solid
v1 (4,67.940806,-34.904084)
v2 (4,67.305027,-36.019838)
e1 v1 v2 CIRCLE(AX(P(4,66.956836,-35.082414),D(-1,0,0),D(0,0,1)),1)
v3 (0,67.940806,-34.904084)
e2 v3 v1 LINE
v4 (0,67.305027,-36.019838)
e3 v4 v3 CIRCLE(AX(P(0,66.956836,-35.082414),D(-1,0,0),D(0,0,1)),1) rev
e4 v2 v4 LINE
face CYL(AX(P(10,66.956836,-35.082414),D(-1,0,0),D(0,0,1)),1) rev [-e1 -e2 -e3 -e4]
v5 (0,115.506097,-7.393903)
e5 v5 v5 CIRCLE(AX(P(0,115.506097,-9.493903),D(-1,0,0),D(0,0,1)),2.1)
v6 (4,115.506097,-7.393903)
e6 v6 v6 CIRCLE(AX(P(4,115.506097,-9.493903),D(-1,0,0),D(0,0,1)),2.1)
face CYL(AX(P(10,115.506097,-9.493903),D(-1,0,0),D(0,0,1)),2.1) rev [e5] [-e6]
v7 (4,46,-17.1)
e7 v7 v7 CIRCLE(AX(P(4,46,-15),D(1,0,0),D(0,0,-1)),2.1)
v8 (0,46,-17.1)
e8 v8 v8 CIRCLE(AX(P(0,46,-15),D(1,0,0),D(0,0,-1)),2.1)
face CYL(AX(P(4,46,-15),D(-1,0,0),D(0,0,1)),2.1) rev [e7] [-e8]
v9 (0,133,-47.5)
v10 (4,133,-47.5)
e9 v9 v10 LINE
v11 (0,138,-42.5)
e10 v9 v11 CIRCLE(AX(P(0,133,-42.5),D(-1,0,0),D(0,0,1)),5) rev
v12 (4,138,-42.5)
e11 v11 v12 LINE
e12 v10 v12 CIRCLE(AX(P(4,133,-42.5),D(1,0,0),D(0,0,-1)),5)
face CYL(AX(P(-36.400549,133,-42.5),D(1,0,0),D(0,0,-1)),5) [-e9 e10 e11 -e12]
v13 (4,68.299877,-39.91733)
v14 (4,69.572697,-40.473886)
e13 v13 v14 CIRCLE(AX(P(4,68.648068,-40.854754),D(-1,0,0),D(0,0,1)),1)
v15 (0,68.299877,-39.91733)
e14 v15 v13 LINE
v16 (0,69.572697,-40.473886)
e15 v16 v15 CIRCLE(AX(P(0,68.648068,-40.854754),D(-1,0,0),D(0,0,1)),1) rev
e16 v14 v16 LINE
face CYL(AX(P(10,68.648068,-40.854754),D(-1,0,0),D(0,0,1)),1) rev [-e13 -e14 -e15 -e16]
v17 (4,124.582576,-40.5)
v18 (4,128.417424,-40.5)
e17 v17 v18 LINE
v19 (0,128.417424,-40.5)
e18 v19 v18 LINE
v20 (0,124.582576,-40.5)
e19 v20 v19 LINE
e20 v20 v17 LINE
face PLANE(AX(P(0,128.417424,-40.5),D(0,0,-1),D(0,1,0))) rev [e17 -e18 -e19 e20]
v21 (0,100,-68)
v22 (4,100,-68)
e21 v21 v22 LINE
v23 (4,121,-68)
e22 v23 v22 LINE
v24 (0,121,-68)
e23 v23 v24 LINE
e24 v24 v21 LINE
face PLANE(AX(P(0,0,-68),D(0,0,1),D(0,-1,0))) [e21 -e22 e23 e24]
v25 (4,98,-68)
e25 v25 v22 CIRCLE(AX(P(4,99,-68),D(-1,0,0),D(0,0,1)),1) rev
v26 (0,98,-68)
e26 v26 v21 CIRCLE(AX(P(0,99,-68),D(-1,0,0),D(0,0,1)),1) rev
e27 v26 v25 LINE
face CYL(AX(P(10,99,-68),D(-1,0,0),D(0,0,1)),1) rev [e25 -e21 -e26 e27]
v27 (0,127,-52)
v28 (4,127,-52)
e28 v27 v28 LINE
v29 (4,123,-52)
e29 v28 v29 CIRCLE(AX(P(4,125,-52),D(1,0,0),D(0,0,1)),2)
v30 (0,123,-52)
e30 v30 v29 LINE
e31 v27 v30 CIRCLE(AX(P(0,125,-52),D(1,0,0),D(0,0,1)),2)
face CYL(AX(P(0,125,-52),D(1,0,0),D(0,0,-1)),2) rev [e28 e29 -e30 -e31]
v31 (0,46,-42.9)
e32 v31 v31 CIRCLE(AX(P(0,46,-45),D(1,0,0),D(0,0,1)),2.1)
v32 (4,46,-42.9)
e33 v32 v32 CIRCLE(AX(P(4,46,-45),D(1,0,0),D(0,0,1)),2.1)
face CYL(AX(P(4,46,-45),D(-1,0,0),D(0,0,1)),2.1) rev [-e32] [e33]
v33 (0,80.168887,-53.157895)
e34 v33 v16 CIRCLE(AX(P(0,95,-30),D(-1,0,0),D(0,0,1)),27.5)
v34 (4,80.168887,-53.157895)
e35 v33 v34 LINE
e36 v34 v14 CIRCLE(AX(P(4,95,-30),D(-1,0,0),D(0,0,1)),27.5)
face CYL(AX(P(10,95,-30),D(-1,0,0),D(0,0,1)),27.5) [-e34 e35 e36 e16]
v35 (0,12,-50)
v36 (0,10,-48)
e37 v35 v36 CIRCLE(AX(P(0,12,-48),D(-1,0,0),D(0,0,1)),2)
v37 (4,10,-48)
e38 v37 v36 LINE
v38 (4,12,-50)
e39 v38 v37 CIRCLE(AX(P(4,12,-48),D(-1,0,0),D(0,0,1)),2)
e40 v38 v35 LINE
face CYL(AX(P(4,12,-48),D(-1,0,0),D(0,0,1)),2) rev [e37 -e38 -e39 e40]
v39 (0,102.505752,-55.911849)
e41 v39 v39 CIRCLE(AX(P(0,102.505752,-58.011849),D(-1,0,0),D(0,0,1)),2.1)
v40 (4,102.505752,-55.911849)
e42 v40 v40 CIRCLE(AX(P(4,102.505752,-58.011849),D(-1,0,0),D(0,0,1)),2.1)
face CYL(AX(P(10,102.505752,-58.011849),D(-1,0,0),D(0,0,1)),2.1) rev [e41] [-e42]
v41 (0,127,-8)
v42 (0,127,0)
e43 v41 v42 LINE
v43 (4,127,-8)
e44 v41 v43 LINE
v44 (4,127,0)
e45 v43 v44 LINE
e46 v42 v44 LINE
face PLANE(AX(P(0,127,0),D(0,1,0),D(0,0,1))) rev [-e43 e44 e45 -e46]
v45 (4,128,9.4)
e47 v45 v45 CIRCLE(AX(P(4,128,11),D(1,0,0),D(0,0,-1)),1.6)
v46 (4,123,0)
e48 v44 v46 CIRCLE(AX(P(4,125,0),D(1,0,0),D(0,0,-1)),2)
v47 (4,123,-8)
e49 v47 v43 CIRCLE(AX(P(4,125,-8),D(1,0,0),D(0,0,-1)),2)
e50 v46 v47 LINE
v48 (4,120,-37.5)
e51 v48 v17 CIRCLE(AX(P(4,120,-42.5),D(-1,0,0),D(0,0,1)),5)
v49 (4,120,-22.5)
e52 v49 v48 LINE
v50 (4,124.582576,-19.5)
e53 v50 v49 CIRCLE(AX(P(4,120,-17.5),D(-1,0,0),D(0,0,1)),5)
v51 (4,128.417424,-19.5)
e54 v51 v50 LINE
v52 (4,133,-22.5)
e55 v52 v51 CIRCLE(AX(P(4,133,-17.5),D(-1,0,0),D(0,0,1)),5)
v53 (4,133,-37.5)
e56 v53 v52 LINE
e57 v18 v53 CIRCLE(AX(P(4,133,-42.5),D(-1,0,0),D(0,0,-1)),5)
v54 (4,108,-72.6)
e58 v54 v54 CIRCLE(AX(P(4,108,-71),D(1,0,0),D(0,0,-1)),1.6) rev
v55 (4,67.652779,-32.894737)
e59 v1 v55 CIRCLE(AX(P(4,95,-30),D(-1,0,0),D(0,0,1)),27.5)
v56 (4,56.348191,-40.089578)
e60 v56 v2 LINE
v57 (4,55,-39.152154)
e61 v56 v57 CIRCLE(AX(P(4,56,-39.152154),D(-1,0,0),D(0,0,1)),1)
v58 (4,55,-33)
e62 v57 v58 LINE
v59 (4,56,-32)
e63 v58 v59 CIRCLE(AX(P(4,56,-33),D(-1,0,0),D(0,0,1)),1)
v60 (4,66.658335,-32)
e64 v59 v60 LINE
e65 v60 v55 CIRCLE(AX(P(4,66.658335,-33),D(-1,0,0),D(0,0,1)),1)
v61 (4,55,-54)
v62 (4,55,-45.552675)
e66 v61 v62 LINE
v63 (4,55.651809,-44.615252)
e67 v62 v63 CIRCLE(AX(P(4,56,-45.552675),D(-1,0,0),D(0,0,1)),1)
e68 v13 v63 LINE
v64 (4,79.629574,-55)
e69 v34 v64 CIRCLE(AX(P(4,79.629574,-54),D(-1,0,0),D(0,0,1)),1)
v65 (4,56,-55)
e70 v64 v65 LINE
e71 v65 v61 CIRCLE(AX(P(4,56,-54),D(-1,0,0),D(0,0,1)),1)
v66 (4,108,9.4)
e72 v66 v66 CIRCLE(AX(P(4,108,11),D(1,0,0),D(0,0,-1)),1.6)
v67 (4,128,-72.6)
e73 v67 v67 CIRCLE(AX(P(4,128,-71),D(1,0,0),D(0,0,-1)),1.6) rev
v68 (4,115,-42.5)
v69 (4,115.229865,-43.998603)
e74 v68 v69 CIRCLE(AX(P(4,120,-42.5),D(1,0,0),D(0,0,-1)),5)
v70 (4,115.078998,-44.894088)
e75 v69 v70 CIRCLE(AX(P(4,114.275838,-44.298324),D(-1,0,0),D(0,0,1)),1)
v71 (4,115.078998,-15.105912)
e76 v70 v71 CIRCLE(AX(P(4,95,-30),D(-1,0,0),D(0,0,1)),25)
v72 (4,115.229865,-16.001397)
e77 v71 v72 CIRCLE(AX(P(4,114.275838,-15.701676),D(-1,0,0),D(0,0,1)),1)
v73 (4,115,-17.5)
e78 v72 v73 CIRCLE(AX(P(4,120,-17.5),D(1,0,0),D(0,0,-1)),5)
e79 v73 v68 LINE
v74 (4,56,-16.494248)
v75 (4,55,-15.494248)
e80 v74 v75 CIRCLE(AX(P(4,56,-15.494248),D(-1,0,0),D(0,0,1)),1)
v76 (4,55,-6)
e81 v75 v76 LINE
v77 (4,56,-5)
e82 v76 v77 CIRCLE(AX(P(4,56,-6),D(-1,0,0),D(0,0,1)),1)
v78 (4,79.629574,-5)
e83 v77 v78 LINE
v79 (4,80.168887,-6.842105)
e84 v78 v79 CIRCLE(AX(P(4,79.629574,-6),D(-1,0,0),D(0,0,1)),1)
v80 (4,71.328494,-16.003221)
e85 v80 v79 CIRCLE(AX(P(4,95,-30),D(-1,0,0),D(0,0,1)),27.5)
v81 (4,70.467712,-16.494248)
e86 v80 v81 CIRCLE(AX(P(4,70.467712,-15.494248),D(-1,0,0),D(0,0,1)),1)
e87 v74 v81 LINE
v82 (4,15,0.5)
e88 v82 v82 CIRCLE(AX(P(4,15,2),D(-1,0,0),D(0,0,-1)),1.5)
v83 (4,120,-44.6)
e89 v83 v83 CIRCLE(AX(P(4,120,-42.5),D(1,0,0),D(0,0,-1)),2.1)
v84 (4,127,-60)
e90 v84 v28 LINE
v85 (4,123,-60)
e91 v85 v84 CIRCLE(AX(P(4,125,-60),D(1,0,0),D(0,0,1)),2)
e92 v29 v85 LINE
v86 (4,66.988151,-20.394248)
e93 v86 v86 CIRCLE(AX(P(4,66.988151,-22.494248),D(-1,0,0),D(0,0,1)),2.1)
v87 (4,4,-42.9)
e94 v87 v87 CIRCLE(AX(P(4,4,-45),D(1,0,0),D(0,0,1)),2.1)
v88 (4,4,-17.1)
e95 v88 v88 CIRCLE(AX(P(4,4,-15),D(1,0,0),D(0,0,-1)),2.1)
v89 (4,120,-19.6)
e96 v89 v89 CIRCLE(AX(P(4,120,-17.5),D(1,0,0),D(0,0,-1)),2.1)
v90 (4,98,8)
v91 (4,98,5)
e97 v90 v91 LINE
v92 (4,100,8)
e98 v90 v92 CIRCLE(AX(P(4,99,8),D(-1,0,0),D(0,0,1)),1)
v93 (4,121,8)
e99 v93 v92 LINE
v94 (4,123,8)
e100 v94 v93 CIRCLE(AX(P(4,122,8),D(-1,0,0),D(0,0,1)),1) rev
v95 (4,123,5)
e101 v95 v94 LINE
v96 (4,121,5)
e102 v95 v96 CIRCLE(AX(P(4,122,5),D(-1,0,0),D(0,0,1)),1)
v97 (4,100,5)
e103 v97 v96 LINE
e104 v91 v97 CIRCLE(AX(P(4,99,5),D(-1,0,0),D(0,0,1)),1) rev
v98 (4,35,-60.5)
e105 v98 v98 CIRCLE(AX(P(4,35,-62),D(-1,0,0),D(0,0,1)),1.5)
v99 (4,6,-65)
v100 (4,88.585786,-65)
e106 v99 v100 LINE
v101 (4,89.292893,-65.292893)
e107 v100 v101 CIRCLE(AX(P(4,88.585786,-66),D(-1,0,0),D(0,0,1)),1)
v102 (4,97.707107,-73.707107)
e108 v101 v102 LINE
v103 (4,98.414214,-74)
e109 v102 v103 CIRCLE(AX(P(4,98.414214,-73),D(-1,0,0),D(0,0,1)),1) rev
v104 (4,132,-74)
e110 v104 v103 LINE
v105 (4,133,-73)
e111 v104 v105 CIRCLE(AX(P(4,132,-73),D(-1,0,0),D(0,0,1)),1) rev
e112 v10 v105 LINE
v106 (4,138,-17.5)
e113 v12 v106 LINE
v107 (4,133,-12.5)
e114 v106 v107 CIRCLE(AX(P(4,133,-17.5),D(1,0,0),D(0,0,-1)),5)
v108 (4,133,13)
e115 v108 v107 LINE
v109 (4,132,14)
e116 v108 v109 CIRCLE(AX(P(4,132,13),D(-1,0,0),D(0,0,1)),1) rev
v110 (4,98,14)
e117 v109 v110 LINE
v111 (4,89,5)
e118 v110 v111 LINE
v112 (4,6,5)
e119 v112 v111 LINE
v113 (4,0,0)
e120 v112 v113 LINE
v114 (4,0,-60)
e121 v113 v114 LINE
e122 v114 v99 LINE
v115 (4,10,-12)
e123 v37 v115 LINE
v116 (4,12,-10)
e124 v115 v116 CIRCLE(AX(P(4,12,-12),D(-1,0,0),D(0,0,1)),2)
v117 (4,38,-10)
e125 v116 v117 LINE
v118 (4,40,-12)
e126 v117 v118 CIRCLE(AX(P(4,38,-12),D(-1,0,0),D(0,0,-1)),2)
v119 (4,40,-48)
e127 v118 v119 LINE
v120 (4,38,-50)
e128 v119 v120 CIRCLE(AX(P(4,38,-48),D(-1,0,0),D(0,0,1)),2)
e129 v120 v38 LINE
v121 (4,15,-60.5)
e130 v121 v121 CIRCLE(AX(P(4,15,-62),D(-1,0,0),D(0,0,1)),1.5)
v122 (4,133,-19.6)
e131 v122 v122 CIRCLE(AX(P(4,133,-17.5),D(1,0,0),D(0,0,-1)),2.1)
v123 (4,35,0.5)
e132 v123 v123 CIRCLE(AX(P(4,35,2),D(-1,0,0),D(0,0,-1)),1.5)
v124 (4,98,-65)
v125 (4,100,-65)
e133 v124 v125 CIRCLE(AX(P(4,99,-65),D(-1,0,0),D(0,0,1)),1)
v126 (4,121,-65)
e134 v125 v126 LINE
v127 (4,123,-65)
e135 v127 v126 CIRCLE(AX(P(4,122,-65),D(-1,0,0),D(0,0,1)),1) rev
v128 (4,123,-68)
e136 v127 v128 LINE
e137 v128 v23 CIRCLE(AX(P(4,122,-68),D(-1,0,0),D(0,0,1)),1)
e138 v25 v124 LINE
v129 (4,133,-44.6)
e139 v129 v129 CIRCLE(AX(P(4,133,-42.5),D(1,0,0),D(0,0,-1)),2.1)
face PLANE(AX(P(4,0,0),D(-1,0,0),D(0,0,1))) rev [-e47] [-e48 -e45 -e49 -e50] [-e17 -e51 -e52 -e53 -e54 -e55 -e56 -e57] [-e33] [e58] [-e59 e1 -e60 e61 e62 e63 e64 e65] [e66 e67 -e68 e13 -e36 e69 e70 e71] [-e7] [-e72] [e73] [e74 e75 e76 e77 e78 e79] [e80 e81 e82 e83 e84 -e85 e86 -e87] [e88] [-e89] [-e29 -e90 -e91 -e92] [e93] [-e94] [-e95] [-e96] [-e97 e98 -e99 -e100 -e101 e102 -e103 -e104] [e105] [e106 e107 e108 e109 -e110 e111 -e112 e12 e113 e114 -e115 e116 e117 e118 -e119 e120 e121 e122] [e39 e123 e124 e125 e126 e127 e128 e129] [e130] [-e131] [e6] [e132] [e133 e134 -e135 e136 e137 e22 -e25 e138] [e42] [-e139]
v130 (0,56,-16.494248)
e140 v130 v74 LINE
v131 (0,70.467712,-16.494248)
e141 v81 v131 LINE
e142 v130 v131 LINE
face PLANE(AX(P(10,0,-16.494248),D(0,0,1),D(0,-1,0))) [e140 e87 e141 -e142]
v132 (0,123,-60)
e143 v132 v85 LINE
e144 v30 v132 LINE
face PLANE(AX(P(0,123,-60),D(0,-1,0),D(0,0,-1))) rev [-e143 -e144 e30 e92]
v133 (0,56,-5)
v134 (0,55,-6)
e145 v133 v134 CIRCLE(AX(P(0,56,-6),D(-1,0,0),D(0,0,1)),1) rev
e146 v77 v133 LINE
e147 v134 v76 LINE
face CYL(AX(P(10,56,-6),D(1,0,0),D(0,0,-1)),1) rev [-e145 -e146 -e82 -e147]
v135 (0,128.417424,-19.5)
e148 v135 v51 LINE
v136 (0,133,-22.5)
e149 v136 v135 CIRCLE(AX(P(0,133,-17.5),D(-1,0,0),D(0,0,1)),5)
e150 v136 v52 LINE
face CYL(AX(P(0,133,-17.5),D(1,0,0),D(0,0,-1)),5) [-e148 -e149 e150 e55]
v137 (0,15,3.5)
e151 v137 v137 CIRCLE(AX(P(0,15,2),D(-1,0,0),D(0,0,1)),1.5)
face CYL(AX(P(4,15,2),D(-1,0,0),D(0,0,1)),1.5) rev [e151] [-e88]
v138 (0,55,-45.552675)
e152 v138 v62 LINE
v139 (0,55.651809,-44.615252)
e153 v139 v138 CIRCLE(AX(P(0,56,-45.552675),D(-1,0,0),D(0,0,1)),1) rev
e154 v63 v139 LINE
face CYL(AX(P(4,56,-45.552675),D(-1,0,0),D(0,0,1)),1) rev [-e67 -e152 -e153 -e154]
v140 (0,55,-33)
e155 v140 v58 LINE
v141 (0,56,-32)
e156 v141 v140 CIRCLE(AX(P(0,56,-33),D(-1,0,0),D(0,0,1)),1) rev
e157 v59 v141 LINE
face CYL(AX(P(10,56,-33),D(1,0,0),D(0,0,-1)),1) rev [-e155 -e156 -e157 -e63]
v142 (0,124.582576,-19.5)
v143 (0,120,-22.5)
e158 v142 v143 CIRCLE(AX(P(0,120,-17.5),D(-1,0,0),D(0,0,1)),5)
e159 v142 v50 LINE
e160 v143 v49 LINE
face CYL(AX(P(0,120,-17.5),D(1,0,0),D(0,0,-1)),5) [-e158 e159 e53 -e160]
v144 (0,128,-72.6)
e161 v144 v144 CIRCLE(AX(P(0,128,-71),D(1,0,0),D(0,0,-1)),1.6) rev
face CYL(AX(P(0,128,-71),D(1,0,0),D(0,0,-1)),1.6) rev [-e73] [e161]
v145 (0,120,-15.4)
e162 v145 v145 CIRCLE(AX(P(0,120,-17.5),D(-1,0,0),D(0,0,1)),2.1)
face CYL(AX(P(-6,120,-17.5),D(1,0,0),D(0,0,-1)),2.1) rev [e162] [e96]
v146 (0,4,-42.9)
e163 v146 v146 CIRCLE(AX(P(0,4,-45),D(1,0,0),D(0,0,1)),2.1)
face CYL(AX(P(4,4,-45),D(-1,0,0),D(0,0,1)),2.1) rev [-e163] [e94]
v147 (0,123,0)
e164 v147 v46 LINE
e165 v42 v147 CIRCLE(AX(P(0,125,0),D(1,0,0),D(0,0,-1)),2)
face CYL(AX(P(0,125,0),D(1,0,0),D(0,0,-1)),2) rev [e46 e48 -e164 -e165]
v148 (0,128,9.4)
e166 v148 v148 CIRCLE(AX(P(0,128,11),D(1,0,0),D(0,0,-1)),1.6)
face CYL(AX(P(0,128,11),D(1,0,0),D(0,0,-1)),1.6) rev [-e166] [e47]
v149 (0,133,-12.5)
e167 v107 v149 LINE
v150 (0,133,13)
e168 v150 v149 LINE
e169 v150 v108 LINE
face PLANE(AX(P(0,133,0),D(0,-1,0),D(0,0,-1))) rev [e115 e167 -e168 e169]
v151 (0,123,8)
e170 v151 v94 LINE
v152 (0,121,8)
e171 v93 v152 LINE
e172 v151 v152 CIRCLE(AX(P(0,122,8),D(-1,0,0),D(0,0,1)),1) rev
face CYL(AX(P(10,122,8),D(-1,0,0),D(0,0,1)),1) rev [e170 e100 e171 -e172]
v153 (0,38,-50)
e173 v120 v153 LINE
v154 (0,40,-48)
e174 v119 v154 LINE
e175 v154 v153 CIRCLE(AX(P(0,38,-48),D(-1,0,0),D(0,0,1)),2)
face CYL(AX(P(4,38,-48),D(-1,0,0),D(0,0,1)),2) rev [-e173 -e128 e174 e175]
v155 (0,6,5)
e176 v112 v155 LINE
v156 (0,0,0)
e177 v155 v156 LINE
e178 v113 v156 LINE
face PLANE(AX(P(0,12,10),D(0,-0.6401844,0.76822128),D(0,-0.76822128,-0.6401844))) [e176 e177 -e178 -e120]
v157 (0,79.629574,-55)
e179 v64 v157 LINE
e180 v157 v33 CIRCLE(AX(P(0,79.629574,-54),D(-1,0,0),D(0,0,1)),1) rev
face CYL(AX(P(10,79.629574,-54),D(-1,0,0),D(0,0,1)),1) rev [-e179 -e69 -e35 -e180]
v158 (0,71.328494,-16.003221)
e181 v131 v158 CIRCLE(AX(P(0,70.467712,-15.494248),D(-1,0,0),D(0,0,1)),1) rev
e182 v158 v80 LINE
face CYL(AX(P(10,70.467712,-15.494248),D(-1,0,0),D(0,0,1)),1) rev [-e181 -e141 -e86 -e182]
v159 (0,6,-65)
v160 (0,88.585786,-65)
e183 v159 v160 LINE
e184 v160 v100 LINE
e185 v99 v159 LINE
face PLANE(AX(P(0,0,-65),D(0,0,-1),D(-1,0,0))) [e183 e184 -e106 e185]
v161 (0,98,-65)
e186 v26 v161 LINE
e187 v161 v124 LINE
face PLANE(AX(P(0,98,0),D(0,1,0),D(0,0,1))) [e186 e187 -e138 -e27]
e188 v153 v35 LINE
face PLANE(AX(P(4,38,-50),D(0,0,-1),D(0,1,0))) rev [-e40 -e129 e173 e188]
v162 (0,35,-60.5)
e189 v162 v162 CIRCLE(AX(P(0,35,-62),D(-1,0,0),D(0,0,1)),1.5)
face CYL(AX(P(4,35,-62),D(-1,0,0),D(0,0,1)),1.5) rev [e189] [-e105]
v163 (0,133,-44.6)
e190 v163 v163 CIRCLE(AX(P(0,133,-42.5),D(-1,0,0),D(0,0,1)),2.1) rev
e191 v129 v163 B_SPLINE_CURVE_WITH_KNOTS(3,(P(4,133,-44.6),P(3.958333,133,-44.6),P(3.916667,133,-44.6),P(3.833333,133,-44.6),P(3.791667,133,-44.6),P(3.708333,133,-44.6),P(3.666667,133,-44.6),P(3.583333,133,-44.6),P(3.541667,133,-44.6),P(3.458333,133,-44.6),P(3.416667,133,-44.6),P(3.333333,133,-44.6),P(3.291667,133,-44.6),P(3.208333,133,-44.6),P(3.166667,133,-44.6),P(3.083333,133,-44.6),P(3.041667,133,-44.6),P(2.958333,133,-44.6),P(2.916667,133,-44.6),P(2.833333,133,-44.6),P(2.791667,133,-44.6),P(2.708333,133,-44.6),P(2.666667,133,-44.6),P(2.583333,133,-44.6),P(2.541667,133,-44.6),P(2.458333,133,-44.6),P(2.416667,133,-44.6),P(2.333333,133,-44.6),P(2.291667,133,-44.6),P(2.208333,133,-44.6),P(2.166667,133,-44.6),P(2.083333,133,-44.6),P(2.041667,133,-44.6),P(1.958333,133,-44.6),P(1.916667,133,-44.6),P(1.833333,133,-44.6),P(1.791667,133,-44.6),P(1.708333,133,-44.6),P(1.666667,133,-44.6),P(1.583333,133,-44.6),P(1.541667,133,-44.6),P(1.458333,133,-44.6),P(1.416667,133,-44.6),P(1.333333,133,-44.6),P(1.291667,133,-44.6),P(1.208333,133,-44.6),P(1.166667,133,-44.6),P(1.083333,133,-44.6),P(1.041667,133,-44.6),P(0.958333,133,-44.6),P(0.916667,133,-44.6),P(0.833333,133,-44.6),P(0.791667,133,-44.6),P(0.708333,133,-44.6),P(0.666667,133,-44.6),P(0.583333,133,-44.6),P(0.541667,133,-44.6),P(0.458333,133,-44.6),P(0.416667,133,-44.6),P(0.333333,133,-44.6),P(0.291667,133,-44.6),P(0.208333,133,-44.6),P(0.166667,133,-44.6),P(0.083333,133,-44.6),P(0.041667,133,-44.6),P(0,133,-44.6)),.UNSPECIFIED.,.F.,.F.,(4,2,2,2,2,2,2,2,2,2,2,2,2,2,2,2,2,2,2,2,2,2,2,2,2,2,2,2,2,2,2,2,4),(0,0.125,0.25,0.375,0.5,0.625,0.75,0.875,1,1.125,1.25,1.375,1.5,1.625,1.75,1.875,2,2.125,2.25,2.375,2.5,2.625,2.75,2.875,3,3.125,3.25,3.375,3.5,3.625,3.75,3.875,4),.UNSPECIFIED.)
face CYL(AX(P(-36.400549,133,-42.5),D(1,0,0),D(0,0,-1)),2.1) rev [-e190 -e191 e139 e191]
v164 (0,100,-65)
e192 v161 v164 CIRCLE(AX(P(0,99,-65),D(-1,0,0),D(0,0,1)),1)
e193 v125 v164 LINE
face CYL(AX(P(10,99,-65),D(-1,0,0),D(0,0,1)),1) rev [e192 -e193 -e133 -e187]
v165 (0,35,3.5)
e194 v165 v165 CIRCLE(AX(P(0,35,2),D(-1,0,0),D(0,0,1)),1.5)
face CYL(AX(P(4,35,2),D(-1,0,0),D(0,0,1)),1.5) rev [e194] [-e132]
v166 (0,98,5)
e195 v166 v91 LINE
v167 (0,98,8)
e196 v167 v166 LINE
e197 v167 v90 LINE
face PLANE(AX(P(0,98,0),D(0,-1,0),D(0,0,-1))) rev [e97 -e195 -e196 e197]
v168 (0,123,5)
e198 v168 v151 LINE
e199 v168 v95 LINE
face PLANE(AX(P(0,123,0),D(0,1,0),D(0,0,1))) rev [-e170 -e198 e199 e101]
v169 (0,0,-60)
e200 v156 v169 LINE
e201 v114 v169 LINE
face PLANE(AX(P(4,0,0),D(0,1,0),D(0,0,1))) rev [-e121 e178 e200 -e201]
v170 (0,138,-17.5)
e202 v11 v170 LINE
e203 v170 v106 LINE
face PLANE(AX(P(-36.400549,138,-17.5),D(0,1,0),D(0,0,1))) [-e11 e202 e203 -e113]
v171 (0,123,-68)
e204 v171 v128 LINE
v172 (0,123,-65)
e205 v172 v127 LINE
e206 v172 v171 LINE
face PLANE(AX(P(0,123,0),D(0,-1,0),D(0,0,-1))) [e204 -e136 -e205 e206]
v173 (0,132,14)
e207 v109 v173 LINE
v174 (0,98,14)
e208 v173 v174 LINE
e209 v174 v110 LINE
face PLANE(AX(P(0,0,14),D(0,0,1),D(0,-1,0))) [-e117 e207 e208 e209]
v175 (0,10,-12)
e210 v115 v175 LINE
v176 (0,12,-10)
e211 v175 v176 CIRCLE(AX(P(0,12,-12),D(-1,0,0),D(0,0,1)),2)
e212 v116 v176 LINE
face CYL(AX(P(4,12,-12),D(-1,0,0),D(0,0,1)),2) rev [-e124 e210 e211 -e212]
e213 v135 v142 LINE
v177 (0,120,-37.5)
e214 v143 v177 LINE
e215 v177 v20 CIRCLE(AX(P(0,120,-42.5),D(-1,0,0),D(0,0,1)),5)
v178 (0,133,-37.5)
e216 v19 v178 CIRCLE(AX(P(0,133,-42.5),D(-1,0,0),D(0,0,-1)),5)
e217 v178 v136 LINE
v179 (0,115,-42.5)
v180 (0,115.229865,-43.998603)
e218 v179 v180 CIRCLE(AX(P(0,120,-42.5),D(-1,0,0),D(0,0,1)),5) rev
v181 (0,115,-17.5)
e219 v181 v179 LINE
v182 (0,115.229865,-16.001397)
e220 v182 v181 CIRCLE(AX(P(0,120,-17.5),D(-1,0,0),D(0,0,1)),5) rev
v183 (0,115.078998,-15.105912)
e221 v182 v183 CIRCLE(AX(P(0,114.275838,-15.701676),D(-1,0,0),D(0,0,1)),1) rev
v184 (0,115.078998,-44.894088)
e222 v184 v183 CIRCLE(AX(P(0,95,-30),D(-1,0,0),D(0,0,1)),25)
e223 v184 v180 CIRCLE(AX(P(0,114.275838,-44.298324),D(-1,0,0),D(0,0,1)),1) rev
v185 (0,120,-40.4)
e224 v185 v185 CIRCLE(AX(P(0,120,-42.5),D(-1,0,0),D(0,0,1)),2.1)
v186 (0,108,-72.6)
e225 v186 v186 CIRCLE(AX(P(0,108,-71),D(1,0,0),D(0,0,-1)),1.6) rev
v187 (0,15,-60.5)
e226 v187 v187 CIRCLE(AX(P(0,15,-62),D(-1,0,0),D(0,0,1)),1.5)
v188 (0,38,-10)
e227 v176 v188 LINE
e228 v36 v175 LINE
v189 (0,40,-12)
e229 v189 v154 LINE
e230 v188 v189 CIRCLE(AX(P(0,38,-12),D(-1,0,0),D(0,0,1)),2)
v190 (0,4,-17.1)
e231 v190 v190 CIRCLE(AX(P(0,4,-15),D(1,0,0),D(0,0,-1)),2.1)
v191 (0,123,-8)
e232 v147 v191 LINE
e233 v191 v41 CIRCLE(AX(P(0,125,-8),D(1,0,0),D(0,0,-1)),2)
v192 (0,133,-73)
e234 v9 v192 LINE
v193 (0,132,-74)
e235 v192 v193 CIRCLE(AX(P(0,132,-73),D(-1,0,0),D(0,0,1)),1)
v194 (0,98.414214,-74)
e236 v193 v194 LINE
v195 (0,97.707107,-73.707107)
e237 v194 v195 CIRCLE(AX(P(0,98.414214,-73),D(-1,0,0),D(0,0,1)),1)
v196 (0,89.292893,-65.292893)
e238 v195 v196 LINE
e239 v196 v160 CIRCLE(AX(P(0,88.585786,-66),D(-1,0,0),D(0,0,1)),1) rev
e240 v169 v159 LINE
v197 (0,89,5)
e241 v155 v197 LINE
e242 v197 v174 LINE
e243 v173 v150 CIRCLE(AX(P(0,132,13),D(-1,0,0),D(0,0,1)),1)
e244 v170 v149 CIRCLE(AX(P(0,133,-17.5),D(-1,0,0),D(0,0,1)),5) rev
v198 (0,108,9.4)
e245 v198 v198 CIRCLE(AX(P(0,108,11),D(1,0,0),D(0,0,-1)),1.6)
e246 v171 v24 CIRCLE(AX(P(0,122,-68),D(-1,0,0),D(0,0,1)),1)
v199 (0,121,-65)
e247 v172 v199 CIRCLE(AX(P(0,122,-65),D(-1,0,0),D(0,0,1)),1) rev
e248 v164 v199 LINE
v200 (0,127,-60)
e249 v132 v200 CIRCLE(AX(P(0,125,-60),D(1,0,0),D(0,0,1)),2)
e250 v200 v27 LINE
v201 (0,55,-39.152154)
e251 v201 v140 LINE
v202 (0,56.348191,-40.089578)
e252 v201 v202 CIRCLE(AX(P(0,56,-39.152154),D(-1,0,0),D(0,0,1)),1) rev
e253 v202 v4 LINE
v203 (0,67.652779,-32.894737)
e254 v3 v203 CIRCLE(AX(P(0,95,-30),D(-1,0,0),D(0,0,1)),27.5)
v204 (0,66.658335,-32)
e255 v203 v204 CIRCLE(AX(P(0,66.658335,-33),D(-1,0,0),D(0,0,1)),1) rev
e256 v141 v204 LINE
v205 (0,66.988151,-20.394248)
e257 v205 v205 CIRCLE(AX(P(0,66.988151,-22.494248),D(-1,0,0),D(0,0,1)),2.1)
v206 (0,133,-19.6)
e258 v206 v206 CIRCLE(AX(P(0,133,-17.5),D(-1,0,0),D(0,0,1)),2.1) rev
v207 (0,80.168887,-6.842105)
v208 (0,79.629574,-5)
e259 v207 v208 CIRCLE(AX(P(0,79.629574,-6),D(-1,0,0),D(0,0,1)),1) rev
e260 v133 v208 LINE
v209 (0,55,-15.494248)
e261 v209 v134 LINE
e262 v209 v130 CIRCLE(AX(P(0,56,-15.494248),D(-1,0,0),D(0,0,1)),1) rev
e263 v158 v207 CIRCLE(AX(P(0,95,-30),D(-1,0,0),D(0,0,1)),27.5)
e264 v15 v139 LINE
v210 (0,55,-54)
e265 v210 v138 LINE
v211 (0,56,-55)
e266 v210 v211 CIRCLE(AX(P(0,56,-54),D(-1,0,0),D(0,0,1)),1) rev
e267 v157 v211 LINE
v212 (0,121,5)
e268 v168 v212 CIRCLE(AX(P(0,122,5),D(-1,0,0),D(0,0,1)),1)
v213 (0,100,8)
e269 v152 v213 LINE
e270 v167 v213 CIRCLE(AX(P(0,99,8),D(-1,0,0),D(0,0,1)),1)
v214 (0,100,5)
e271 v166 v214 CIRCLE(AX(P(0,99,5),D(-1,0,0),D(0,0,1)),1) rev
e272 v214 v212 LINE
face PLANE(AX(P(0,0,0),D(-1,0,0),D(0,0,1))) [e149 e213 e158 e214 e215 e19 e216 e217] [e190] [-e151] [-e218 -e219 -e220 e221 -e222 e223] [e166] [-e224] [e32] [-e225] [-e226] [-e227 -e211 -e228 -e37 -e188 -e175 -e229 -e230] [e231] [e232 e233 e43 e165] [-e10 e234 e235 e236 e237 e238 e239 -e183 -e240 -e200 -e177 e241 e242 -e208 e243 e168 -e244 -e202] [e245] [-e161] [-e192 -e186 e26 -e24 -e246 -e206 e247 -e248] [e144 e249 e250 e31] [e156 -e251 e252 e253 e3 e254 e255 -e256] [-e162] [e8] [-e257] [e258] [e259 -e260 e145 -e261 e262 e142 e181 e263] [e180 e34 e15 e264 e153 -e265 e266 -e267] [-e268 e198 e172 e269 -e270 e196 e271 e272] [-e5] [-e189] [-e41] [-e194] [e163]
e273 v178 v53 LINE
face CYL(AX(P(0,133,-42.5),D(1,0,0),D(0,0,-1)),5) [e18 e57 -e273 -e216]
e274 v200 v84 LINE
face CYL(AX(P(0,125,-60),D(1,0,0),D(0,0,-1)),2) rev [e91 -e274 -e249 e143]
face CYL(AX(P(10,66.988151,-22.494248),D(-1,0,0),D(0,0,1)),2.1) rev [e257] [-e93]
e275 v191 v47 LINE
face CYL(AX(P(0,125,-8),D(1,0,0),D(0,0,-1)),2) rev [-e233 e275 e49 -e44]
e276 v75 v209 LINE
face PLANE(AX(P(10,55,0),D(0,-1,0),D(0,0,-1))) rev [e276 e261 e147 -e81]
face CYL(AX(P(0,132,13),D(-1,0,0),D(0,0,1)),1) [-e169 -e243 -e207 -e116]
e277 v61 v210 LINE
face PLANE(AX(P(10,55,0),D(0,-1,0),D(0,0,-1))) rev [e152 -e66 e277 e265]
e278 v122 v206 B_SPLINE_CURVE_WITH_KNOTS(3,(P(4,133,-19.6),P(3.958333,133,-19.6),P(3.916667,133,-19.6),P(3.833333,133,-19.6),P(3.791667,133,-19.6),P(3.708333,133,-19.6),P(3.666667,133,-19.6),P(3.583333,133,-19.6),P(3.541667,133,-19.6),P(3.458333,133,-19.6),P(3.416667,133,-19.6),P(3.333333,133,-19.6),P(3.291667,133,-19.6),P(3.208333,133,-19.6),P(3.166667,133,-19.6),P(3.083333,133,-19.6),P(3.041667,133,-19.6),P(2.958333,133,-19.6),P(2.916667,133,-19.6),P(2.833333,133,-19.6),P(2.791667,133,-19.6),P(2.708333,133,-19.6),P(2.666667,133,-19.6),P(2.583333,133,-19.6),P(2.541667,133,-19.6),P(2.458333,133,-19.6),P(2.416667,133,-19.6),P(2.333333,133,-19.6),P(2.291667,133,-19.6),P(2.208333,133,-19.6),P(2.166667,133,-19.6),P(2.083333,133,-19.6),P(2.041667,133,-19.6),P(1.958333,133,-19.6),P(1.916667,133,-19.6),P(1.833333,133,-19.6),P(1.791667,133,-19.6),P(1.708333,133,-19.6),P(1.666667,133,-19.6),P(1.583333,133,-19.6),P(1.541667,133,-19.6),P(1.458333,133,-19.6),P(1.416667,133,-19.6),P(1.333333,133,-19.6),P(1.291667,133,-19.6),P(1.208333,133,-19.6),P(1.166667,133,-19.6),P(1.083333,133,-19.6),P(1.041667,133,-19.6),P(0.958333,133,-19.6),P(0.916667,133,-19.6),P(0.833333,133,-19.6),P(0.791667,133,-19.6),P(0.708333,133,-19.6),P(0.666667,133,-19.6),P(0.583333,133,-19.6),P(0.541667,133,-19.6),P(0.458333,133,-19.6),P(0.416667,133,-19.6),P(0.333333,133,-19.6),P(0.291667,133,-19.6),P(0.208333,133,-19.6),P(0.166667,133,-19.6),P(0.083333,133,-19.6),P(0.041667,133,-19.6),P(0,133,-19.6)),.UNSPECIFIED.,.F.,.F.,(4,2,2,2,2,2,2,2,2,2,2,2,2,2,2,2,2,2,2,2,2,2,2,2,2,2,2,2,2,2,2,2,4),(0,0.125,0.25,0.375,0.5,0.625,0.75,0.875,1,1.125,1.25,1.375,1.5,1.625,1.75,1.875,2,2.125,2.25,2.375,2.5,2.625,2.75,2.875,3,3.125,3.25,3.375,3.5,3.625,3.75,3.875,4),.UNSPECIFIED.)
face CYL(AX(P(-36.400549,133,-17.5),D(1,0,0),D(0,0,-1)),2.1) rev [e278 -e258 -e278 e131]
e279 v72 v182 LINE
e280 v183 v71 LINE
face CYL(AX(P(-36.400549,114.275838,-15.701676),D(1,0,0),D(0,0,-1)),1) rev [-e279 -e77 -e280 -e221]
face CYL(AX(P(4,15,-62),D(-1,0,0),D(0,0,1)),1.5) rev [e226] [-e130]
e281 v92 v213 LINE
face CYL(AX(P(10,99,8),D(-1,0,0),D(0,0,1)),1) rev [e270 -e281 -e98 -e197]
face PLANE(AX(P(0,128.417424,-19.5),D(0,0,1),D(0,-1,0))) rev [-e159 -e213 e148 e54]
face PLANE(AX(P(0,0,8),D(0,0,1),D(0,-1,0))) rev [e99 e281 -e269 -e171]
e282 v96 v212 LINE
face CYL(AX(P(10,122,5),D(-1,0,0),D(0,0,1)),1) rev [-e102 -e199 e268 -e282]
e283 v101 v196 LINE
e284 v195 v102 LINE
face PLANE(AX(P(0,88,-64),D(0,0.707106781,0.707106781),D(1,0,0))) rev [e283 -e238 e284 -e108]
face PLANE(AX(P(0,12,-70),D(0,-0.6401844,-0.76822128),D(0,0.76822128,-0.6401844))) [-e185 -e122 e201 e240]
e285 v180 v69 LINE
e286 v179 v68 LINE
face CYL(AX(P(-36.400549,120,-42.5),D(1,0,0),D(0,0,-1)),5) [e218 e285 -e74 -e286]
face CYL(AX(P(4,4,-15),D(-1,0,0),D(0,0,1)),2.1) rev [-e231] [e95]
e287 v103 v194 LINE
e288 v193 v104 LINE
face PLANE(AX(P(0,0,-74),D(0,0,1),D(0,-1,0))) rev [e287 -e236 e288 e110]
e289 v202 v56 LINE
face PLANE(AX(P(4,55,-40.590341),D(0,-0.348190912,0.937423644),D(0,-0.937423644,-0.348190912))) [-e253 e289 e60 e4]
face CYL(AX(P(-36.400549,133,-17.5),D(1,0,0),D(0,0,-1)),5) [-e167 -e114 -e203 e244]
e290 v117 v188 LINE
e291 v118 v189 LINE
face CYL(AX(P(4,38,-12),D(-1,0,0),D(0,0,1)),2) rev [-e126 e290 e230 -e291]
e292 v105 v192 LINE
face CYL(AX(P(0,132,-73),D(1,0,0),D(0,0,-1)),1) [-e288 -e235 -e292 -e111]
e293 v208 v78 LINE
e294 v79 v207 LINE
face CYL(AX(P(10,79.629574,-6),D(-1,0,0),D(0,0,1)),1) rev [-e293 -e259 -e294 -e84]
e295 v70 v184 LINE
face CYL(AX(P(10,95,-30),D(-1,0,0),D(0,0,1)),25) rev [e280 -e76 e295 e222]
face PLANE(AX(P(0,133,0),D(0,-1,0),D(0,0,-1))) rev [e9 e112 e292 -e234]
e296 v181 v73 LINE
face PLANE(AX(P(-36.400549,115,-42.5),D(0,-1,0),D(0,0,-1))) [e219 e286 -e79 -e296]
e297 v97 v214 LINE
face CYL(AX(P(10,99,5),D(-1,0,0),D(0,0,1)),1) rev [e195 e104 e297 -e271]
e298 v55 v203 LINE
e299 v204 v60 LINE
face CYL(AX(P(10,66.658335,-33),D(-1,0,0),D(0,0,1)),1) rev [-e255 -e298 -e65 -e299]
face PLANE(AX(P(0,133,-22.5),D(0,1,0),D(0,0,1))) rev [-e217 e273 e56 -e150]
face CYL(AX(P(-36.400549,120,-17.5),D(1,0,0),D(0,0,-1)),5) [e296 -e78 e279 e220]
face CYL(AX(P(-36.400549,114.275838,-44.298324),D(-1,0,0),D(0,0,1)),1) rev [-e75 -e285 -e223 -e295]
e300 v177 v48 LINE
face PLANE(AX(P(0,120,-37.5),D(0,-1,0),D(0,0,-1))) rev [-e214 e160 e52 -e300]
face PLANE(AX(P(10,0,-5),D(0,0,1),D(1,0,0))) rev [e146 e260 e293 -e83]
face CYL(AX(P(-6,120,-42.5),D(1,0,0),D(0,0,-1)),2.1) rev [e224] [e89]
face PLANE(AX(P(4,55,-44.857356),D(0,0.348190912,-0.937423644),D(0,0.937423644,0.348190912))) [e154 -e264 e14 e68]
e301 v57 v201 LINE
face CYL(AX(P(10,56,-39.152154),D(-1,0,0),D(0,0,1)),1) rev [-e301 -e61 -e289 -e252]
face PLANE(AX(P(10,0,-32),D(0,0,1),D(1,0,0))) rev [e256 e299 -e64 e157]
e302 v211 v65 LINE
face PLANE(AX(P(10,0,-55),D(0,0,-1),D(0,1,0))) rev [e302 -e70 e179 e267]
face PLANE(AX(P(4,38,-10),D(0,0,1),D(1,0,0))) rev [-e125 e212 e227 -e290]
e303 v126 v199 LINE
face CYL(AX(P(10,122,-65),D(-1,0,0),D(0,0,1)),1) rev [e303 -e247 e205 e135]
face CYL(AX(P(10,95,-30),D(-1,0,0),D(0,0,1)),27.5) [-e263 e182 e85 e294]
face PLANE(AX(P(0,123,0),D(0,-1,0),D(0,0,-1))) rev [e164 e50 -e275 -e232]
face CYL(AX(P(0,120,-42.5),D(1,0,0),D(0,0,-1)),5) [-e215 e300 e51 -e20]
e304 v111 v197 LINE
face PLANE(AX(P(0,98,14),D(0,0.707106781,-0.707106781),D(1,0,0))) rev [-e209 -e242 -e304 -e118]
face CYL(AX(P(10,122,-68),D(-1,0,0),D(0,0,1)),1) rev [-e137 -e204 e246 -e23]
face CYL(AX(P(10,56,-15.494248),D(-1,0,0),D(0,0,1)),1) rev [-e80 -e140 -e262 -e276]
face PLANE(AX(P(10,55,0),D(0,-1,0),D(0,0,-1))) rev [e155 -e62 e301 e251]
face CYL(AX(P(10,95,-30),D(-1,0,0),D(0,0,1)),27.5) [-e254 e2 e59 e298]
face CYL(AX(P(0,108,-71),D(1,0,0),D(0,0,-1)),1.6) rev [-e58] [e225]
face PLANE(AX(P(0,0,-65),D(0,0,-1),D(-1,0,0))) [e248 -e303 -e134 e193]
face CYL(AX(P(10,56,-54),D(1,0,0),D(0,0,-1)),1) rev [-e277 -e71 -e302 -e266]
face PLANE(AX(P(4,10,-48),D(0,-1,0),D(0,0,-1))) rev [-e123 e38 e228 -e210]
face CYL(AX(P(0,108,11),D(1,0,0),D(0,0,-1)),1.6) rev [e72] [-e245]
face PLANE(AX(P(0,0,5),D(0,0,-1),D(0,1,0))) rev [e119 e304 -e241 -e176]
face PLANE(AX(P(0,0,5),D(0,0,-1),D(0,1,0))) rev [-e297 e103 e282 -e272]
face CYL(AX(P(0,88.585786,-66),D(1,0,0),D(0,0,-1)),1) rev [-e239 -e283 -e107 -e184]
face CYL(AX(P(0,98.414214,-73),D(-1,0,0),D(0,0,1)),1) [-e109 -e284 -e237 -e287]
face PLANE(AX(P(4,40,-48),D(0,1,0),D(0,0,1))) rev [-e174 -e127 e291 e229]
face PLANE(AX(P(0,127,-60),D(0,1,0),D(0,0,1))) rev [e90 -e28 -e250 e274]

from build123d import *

# Parameters (mm, degrees)
SKETCH_1_W           = 60
SKETCH_1_H           = 50
SKETCH_1_R           = 2.1
EXTRUDE_1_DEPTH      = 4
EXTRUDE_2_DEPTH      = 4
EXTRUDE_4_DEPTH      = 4
SKETCH_10_W          = 9
SKETCH_10_H          = 10
SKETCH_10_W_2        = 3
EXTRUDE_5_DEPTH      = 4
CHAMFER_1_SIZE       = 10
SKETCH_11_R          = 25
SKETCH_11_R_2        = 2.1
CUT_EXTRUDE_7_DEPTH  = 10
CUT_EXTRUDE_8_DEPTH  = 10
EXTRUDE_6_DEPTH      = 4
SKETCH_16_R          = 1.6
CUT_EXTRUDE_9_DEPTH  = 4
CUT_EXTRUDE_11_DEPTH = 10
SKETCH_21_R          = 2.1
EXTRUDE_7_DEPTH      = 4
SKETCH_21_2_R        = 2.1
CUT_EXTRUDE_12_DEPTH = 10
CUT_EXTRUDE_13_DEPTH = 157.639713994
CUT_EXTRUDE_14_DEPTH = 157.639713994
SKETCH_24_R          = 1.5
CUT_EXTRUDE_15_DEPTH = 4
FILLET_1_R           = 1


with BuildPart() as part:
    # 草图1 → 凸台-拉伸1 (new body)
    with BuildSketch(Plane(origin=(0, 0, 0), x_dir=(0, 0, -1), z_dir=(1, 0, 0))):
        with Locations((30, 25)):
            Rectangle(SKETCH_1_W, SKETCH_1_H)
        with Locations((15, 4)):
            Circle(SKETCH_1_R, mode=Mode.SUBTRACT)
        with Locations((15, 46)):
            Circle(SKETCH_1_R, mode=Mode.SUBTRACT)
        with Locations(Location((45, 4, 0), (0, 0, 180))):
            Circle(SKETCH_1_R, mode=Mode.SUBTRACT)
        with Locations(Location((45, 46, 0), (0, 0, 180))):
            Circle(SKETCH_1_R, mode=Mode.SUBTRACT)
    extrude(amount=EXTRUDE_1_DEPTH)

    # 草图3 → 凸台-拉伸2 (add)
    with BuildSketch(Plane(origin=(4, 0, 0), x_dir=(0, 0, -1), z_dir=(1, 0, 0))):
        Polygon((0, 50), (-10, 38), (-10, 12), (0, 0), align=None)
        Polygon((70, 12), (60, 0), (60, 50), (70, 38), align=None)
    extrude(amount=-EXTRUDE_2_DEPTH)

    # 草图9 → 凸台-拉伸4 (add)
    with BuildSketch(Plane(origin=(4, 0, 0), x_dir=(0, 0, -1), z_dir=(1, 0, 0))):
        Polygon((60, 50), (65, 50), (65, 133), (60, 133), (0, 133), (-5, 133), (-5, 50), (0, 50), align=None)
        Polygon((-5, 50), (-5, 44), (0, 50), align=None)
        Polygon((65, 44), (60, 50), (65, 50), align=None)
    extrude(amount=-EXTRUDE_4_DEPTH)

    # 草图10 → 凸台-拉伸5 (add)
    with BuildSketch(Plane(origin=(4, 0, 0), x_dir=(0, 0, -1), z_dir=(1, 0, 0))):
        with Locations((-9.5, 128)):
            Rectangle(SKETCH_10_W, SKETCH_10_H)
        Polygon((-8, 123), (-14, 123), (-14, 88), (-8, 88), (-8, 98), align=None)
        with Locations((-6.5, 93)):
            Rectangle(SKETCH_10_W_2, SKETCH_10_H)
        with Locations((66.5, 93)):
            Rectangle(SKETCH_10_W_2, SKETCH_10_H)
        Polygon((68, 98), (68, 88), (74, 88), (74, 123), (68, 123), align=None)
        Polygon((65, 123), (68, 123), (74, 123), (74, 133), (65, 133), align=None)
    extrude(amount=-EXTRUDE_5_DEPTH)

    # 倒角1
    # the kernel refuses this chamfer: 10 mm, written as the material it takes off along each edge
    with BuildSketch(Plane(origin=(29.71682988, 88, -74), x_dir=(0, 0.9996219169112968, -0.027495876610586317), z_dir=(-1, 0, 0))) as chamfer_1_piece_1_section:
        Polygon((CHAMFER_1_SIZE * 0.999621916911, -CHAMFER_1_SIZE * 0.0274958766106), (-CHAMFER_1_SIZE * 0.0274958766106, -CHAMFER_1_SIZE * 0.999621916911), (0, 0), align=None)
    chamfer_1_piece_1 = extrude(amount=55.433659759, mode=Mode.PRIVATE)
    chamfer_1_piece_1 = split(chamfer_1_piece_1, bisect_by=Plane(origin=(2, 91.359007471, -65), z_dir=(0, 0, -1)), keep=Keep.TOP, mode=Mode.PRIVATE)
    add(chamfer_1_piece_1, mode=Mode.SUBTRACT)
    with BuildSketch(Plane(origin=(29.71682988, 88, 14), x_dir=(0, -0.027495876610586317, -0.9996219169112968), z_dir=(-1, 0, 0))) as chamfer_1_piece_2_section:
        Polygon((CHAMFER_1_SIZE * 0.999621916911, -CHAMFER_1_SIZE * 0.0274958766106), (-CHAMFER_1_SIZE * 0.0274958766106, -CHAMFER_1_SIZE * 0.999621916911), (0, 0), align=None)
    chamfer_1_piece_2 = extrude(amount=55.433659759, mode=Mode.PRIVATE)
    chamfer_1_piece_2 = split(chamfer_1_piece_2, bisect_by=Plane(origin=(2, 91.359007471, 5), z_dir=(0, 0, 1)), keep=Keep.TOP, mode=Mode.PRIVATE)
    add(chamfer_1_piece_2, mode=Mode.SUBTRACT)

    # 草图11 → 切除-拉伸7 (cut)
    with BuildSketch(Plane.ZY):
        with Locations((-30, 95)):
            Circle(SKETCH_11_R)
        with Locations((-9.493903346, 115.506096654)):
            Circle(SKETCH_11_R_2)
        with Locations((-22.494247692, 66.988151038)):
            Circle(SKETCH_11_R_2)
        with Locations((-58.011848962, 102.505752308)):
            Circle(SKETCH_11_R_2)
    extrude(amount=-CUT_EXTRUDE_7_DEPTH, mode=Mode.SUBTRACT)

    # 草图12 → 切除-拉伸8 (cut)
    with BuildSketch(Plane.ZY):
        with BuildLine():
            ThreePointArc((-32, 67.572823696), (-45.68490072, 72.411642614), (-55, 83.543560763))
            Line((-55, 83.543560763), (-55, 55))
            Line((-55, 55), (-32, 55))
            Line((-32, 55), (-32, 67.572823696))
        make_face()
        with BuildLine():
            ThreePointArc((-5, 83.543560763), (-9.75828346, 76.38487412), (-16.494247692, 71.044945114))
            Line((-16.494247692, 71.044945114), (-16.494247692, 55))
            Line((-16.494247692, 55), (-5, 55))
            Line((-5, 55), (-5, 83.543560763))
        make_face()
    extrude(amount=-CUT_EXTRUDE_8_DEPTH, mode=Mode.SUBTRACT)

    # 草图14 → 凸台-拉伸6 (add)
    with BuildSketch(Plane.ZY):
        with BuildLine():
            Line((-44.857355631, 55), (-39.575250068, 69.220849779))
            ThreePointArc((-39.575250068, 69.220849779), (-37.669905745, 68.591241115), (-35.723722086, 68.102249063))
            Line((-35.723722086, 68.102249063), (-40.590341434, 55))
            Line((-40.590341434, 55), (-44.857355631, 55))
        make_face()
    extrude(amount=-EXTRUDE_6_DEPTH)

    # 草图16 → 切除-拉伸9 (cut)
    with BuildSketch(Plane(origin=(4, 0, 0), x_dir=(0, 0, -1), z_dir=(1, 0, 0))):
        with Locations((-11, 128)):
            Circle(SKETCH_16_R)
        with Locations((-11, 108)):
            Circle(SKETCH_16_R)
        with Locations((71, 108)):
            Circle(SKETCH_16_R)
        with Locations((71, 128)):
            Circle(SKETCH_16_R)
    extrude(amount=-CUT_EXTRUDE_9_DEPTH, mode=Mode.SUBTRACT)

    # 草图20 → 切除-拉伸11 (cut)
    with BuildSketch(Plane.ZY):
        with BuildLine():
            ThreePointArc((8, 121), (9, 122), (8, 123))
            Line((8, 123), (8, 121))
        make_face()
        with BuildLine():
            Line((8, 100), (8, 98))
            ThreePointArc((8, 98), (9, 99), (8, 100))
        make_face()
        with BuildLine():
            Line((5, 121), (5, 123))
            ThreePointArc((5, 123), (4, 122), (5, 121))
        make_face()
        with BuildLine():
            ThreePointArc((5, 100), (4, 99), (5, 98))
            Line((5, 98), (5, 100))
        make_face()
        with BuildLine():
            Line((-65, 100), (-65, 98))
            ThreePointArc((-65, 98), (-64, 99), (-65, 100))
        make_face()
        with BuildLine():
            ThreePointArc((-65, 121), (-64, 122), (-65, 123))
            Line((-65, 123), (-65, 121))
        make_face()
        with BuildLine():
            ThreePointArc((-68, 100), (-69, 99), (-68, 98))
            Line((-68, 98), (-68, 100))
        make_face()
        with BuildLine():
            Line((-68, 121), (-68, 123))
            ThreePointArc((-68, 123), (-69, 122), (-68, 121))
        make_face()
    extrude(amount=-CUT_EXTRUDE_11_DEPTH, mode=Mode.SUBTRACT)

    # 草图21 → 凸台-拉伸7 (add)
    # profile 1 of 2: a face of its own
    with BuildSketch(Plane(origin=(4, 0, 0), x_dir=(0, 0, -1), z_dir=(1, 0, 0))):
        with BuildLine():
            Line((17.5, 138), (42.5, 138))
            ThreePointArc((42.5, 138), (46.035533906, 129.464466094), (37.5, 133))
            Line((37.5, 133), (22.5, 133))
            ThreePointArc((22.5, 133), (13.964466094, 129.464466094), (17.5, 138))
        make_face()
        with Locations((17.5, 133)):
            Circle(SKETCH_21_R, mode=Mode.SUBTRACT)
        with Locations((42.5, 133)):
            Circle(SKETCH_21_R, mode=Mode.SUBTRACT)
    # profile 2 of 2: a face of its own
    with BuildSketch(Plane(origin=(4, 0, 0), x_dir=(0, 0, -1), z_dir=(1, 0, 0))):
        with BuildLine():
            Line((42.5, 115), (17.5, 115))
            ThreePointArc((17.5, 115), (13.964466094, 123.535533906), (22.5, 120))
            Line((22.5, 120), (37.5, 120))
            ThreePointArc((37.5, 120), (46.035533906, 123.535533906), (42.5, 115))
        make_face()
        with Locations((17.5, 120)):
            Circle(SKETCH_21_R, mode=Mode.SUBTRACT)
        with Locations((42.5, 120)):
            Circle(SKETCH_21_R, mode=Mode.SUBTRACT)
    extrude(amount=-EXTRUDE_7_DEPTH)

    # 草图21<2> → 切除-拉伸12 (cut)
    with BuildSketch(Plane(origin=(4, 0, 0), x_dir=(0, 0, -1), z_dir=(1, 0, 0))):
        with Locations((17.5, 133)):
            Circle(SKETCH_21_2_R)
        with Locations((17.5, 120)):
            Circle(SKETCH_21_2_R)
        with Locations((42.5, 120)):
            Circle(SKETCH_21_2_R)
        with Locations((42.5, 133)):
            Circle(SKETCH_21_2_R)
    extrude(amount=-CUT_EXTRUDE_12_DEPTH, mode=Mode.SUBTRACT)

    # 草图22 → 切除-拉伸13 (cut, through all)
    with BuildSketch(Plane(origin=(4, 0, 0), x_dir=(0, 0, -1), z_dir=(1, 0, 0))):
        with BuildLine():
            Line((22.5, 133), (37.5, 133))
            ThreePointArc((37.5, 133), (38.316699867, 130.261387212), (40.5, 128.417424305))
            Line((40.5, 128.417424305), (40.5, 124.582575695))
            ThreePointArc((40.5, 124.582575695), (38.316699867, 122.738612788), (37.5, 120))
            Line((37.5, 120), (22.5, 120))
            ThreePointArc((22.5, 120), (21.683300133, 122.738612788), (19.5, 124.582575695))
            Line((19.5, 124.582575695), (19.5, 128.417424305))
            ThreePointArc((19.5, 128.417424305), (21.683300133, 130.261387212), (22.5, 133))
        make_face()
    extrude(amount=-CUT_EXTRUDE_13_DEPTH, mode=Mode.SUBTRACT)

    # 草图23 → 切除-拉伸14 (cut, through all)
    with BuildSketch(Plane(origin=(4, 0, 0), x_dir=(0, 0, -1), z_dir=(1, 0, 0))):
        with BuildLine():
            Line((0, 127), (8, 127))
            ThreePointArc((8, 127), (10, 125), (8, 123))
            Line((8, 123), (0, 123))
            ThreePointArc((0, 123), (-2, 125), (0, 127))
        make_face()
        with BuildLine():
            Line((60, 127), (52, 127))
            ThreePointArc((52, 127), (50, 125), (52, 123))
            Line((52, 123), (60, 123))
            ThreePointArc((60, 123), (62, 125), (60, 127))
        make_face()
    extrude(amount=-CUT_EXTRUDE_14_DEPTH, mode=Mode.SUBTRACT)

    # 草图24 → 切除-拉伸15 (cut)
    with BuildSketch(Plane.ZY):
        with Locations((-62, 35)):
            Circle(SKETCH_24_R)
        with Locations((-62, 15)):
            Circle(SKETCH_24_R)
        with Locations((2, 15)):
            Circle(SKETCH_24_R)
        with Locations((2, 35)):
            Circle(SKETCH_24_R)
        Polygon((-65, 44), (-65, 6), (-70, 12), (-70, 38), align=None)
        Polygon((5, 44), (5, 6), (10, 12), (10, 38), align=None)
        with BuildLine():
            Line((-48, 40), (-12, 40))
            ThreePointArc((-12, 40), (-10.585786438, 39.414213562), (-10, 38))
            Line((-10, 38), (-10, 12))
            ThreePointArc((-10, 12), (-10.585786438, 10.585786438), (-12, 10))
            Line((-12, 10), (-48, 10))
            ThreePointArc((-48, 10), (-49.414213562, 10.585786438), (-50, 12))
            Line((-50, 12), (-50, 38))
            ThreePointArc((-50, 38), (-49.414213562, 39.414213562), (-48, 40))
        make_face()
    extrude(amount=-CUT_EXTRUDE_15_DEPTH, mode=Mode.SUBTRACT)

    # 圆角1
    fillet_1_edges = [part.edges().sort_by_distance(p)[0] for p in [
        (2, 133, -74),
        (2, 98, -74),
        (2, 89, -65),
        (2, 83.543560763, -55),
        (2, 67.572823696, -32),
        (2, 55, -32),
        (2, 55, -55),
        (2, 71.044945114, -16.494247692),
        (2, 83.543560763, -5),
        (2, 55, -5),
        (2, 55, -16.494247692),
        (2, 69.220849779, -39.575250068),
        (2, 68.102249063, -35.723722086),
        (2, 55, -40.590341434),
        (2, 55, -44.857355631),
        (2, 115.397795547, -15.545591094),
        (2, 115.397795547, -44.454408906),
        (2, 133, 14),
    ]]
    fillet(fillet_1_edges, radius=FILLET_1_R)


solid = part.part
